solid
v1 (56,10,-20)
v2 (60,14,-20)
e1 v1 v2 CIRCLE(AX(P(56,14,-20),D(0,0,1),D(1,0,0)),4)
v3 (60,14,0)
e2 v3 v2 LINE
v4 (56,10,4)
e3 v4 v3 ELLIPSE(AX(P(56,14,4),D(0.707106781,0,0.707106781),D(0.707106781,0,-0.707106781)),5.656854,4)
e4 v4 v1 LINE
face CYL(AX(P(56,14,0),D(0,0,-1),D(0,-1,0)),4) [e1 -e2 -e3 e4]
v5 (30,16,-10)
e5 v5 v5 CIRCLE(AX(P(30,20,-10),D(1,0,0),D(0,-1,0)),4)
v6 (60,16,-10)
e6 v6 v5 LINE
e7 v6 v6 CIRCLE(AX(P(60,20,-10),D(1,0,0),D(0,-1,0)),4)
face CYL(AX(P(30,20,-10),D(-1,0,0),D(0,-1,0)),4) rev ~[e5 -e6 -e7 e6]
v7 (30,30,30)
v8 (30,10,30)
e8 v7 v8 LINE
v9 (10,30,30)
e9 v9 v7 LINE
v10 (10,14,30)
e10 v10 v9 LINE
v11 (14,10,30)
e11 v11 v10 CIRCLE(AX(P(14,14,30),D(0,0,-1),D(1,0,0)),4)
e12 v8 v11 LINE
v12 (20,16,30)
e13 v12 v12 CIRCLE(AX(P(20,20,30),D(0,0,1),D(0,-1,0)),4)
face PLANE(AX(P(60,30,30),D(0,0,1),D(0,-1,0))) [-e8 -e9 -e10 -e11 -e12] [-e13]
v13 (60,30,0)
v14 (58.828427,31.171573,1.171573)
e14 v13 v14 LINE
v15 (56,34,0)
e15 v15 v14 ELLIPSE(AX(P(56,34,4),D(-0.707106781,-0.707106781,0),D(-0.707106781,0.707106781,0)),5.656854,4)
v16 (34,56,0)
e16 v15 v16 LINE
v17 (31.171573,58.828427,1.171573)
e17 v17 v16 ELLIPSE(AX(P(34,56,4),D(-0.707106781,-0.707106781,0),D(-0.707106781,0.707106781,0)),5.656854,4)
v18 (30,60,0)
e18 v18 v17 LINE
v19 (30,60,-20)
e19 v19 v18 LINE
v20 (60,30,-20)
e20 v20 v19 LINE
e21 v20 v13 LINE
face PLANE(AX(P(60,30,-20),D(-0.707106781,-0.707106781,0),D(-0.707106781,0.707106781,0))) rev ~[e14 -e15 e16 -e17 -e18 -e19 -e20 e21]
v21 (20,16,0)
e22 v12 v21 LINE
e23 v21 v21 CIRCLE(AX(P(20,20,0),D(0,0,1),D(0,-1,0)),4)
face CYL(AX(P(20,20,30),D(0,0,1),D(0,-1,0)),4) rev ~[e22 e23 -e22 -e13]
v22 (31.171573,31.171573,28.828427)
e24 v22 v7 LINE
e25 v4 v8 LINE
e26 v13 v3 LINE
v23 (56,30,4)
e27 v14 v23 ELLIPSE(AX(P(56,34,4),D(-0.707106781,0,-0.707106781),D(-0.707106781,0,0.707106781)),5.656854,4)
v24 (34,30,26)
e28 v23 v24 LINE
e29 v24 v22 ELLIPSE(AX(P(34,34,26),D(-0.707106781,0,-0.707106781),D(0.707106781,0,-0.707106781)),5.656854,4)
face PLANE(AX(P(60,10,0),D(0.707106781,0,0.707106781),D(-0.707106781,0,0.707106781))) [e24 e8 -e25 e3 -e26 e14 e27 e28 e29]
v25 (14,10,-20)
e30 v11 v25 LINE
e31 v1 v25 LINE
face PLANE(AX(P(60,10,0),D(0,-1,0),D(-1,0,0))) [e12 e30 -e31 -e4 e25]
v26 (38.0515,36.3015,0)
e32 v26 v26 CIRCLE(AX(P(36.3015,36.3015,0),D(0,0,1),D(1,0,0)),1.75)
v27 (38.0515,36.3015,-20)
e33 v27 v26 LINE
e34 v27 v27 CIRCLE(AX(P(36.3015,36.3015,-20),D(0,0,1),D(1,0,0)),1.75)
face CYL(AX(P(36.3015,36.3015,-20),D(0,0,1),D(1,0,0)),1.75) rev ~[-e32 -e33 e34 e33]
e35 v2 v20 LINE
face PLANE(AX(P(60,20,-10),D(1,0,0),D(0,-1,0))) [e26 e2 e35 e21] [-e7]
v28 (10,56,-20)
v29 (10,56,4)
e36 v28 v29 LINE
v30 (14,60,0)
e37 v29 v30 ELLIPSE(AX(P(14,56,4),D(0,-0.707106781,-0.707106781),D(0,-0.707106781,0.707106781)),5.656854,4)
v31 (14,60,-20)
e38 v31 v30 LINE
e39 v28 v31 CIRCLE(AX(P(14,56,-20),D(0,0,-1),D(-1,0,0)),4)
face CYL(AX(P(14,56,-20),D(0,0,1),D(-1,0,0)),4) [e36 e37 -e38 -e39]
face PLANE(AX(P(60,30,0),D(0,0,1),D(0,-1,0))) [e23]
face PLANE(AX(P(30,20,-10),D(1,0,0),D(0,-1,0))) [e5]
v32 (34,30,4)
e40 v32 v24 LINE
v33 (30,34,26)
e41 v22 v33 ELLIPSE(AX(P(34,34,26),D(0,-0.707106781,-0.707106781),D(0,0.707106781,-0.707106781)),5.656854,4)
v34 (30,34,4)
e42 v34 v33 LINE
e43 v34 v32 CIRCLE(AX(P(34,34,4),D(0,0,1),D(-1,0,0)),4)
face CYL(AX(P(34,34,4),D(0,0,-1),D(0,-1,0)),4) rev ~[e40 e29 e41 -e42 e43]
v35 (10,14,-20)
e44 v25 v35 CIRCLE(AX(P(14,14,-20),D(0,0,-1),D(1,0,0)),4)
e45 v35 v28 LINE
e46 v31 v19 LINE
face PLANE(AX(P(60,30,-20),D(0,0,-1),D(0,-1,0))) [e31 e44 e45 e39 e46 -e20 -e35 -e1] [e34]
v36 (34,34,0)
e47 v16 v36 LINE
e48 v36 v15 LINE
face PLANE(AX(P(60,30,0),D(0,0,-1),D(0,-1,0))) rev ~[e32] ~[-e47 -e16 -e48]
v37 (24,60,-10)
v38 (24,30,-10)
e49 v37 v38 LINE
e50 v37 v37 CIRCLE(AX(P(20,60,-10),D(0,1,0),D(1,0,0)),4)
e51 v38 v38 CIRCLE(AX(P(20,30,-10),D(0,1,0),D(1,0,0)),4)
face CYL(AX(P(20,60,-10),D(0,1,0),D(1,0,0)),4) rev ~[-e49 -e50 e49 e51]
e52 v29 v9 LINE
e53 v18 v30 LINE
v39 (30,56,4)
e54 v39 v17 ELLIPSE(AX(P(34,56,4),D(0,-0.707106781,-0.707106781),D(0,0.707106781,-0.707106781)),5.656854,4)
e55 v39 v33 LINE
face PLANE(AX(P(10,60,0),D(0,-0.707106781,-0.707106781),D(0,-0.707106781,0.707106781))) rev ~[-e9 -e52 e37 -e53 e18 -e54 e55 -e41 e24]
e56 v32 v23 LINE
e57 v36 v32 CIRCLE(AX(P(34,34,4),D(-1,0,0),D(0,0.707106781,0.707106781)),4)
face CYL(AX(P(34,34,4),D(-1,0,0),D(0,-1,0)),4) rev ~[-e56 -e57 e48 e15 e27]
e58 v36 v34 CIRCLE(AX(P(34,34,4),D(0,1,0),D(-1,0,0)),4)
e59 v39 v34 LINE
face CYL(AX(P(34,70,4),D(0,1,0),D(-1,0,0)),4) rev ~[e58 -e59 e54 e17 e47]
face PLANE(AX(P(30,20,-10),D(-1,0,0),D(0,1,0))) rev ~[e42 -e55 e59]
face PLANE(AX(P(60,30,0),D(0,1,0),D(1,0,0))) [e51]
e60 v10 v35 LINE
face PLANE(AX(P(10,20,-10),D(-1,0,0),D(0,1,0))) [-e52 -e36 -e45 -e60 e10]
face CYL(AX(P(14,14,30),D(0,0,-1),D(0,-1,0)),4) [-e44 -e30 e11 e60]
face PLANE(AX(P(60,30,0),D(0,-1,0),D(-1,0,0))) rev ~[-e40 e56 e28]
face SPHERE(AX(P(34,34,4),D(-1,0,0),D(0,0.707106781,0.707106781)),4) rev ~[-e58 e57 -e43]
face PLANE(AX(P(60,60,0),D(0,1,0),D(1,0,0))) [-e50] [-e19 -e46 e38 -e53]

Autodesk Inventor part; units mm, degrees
ref_plane "YZ Plane" through (0, 0, 0) normal (1, 0, 0) x (0, 1, 0)
ref_plane "XZ Plane" through (0, 0, 0) normal (0, 1, 0) x (-1, 0, 0)
ref_plane "XY Plane" through (0, 0, 0) normal (0, 0, 1) x (1, 0, 0)
sketch "Sketch1" plane through (0, 0, 0) normal (0, 0, 1) x (1, 0, 0)
  circle A0 centre (0, 0) radius 4
  line L0 (-10, -10) -> (10, -10)
  line L1 (10, -10) -> (10, 10)
  line L2 (10, 10) -> (-10, 10)
  line L3 (-10, 10) -> (-10, -10)
  line L4 (-10, -10) -> (10, 10) construction
  line L5 (10, -10) -> (-10, 10) construction
  dimension "d0" = 8
  dimension "d3" = 20
  dimension "d4" = 10
  dimension "d5" = 10
extrude "Extrusion1" add sketch "Sketch1" along normal blind 30 and the other way blind 20
extrude "Extrusion2" add sketch "Sketch1" against normal up to surface (20 mm away) contours A0
sketch "Sketch2" plane through (-10, -10, 30) normal (-1, 0, 0) x (0, 0, 1)
  line L0 (-50, 20) -> (-50, 0) projected
  line L1 (-50, 20) -> (-30, 20)
  line L2 (-30, 20) -> (-30, 0)
  line L3 (-30, 0) -> (-50, 0)
  line L4 (-50, 0) -> (-50, 20)
  point P0 (-30, 10)
extrude "Extrusion3" add sketch "Sketch2" along normal blind 30
sketch "Sketch3" plane through (-10, -10, 30) normal (0, -1, 0) x (1, 0, 0)
  line L0 (0, -30) -> (-30, -30) projected
  line L1 (0, -30) -> (20, -30)
  line L2 (20, -30) -> (20, -50)
  line L3 (20, -50) -> (0, -50)
  line L4 (0, -50) -> (0, -30)
  point P0 (10, -30)
extrude "Extrusion4" add sketch "Sketch3" along normal blind 30
sketch "Sketch4" plane through (-40, -10, 30) normal (-1, 0, 0) x (0, 0, 1)
  circle A0 centre (-40, 10) radius 4
  point P0 (-30, 10)
  dimension "d16" = 8
extrude "Extrusion5" cut sketch "Sketch4" against normal blind 30
sketch "Sketch5" plane through (-10, -40, 30) normal (0, -1, 0) x (1, 0, 0)
  circle A0 centre (10, -40) radius 4
  point P0 (10, -30)
  dimension "d19" = 8
extrude "Extrusion6" cut sketch "Sketch5" against normal blind 30
sketch "Sketch6" plane through (0, 0, -20) normal (0, 0, -1) x (-1, 0, 0)
  line L0 (10, -10) -> (40, -10) projected
  line L1 (10, -10) -> (10, -40) projected
  line L2 (10, -40) -> (-10, -40) projected
  line L3 (40, -10) -> (10, -40)
  point P0 (0, 0)
extrude "Extrusion7" add sketch "Sketch6" against normal blind 20
sketch "Sketch7" plane through (-10, 10, 30) normal (0, 1, 0) x (1, 0, 0)
  line L0 (-30, 30) -> (-30, 50) projected
  line L1 (0, 30) -> (-30, 30) projected
  line L2 (-30, 30) -> (0, 30)
  line L3 (0, 0) -> (20, 0) projected
  line L4 (0, 30) -> (0, 0)
  line L5 (0, 0) -> (-30, 30)
  point P0 (10, 30)
extrude "Extrusion8" add sketch "Sketch7" against normal blind 20
sketch "Sketch8" plane through (10, -10, 30) normal (1, 0, 0) x (0, 0, -1)
  line L0 (30, 0) -> (0, 0) projected
  line L1 (30, 0) -> (30, -30) projected
  line L2 (0, 20) -> (0, 0) projected
  line L3 (0, 0) -> (30, -30)
  point P0 (30, 10)
extrude "Extrusion9" add sketch "Sketch8" against normal blind 20
sketch "Sketch9" plane through (10, 10, 30) normal (0, 1, 0) x (1, 0, 0)
  line L0 (-50, 36) -> (-20, 36) projected
  line L1 (-14, 30) -> (-14, 0) projected
  circle A0 centre (-26.3015, 23.6985) radius 12.3015
  line L2 (-50, 30) -> (-20, 0) projected
  point P0 (-10, 30)
hole "Hole1" at (-16.3015, 10, 6.3015) direction (0, -1, 0) diameter 3.5 end through all
fillet "Fillet1" radius 4 3 edges at (-10, -25, 0) (-10, -10, 15) (-25, -10, 0)
fillet "Fillet2" radius 4 1 edges at (10, -15, -20)
fillet "Fillet3" radius 4 2 edges at (10, 0, 30) (-40, 0, -20)
move or copy body "Move Body1" bodies to move or copy 1 copy no rotation origin (0, 0, 0) rotation axis (-0.5773503, 0.5773503, -0.5773503) rotation angle 120 translate (30, 20, -10)
properties part number "connector" material "ABS Plastic"
